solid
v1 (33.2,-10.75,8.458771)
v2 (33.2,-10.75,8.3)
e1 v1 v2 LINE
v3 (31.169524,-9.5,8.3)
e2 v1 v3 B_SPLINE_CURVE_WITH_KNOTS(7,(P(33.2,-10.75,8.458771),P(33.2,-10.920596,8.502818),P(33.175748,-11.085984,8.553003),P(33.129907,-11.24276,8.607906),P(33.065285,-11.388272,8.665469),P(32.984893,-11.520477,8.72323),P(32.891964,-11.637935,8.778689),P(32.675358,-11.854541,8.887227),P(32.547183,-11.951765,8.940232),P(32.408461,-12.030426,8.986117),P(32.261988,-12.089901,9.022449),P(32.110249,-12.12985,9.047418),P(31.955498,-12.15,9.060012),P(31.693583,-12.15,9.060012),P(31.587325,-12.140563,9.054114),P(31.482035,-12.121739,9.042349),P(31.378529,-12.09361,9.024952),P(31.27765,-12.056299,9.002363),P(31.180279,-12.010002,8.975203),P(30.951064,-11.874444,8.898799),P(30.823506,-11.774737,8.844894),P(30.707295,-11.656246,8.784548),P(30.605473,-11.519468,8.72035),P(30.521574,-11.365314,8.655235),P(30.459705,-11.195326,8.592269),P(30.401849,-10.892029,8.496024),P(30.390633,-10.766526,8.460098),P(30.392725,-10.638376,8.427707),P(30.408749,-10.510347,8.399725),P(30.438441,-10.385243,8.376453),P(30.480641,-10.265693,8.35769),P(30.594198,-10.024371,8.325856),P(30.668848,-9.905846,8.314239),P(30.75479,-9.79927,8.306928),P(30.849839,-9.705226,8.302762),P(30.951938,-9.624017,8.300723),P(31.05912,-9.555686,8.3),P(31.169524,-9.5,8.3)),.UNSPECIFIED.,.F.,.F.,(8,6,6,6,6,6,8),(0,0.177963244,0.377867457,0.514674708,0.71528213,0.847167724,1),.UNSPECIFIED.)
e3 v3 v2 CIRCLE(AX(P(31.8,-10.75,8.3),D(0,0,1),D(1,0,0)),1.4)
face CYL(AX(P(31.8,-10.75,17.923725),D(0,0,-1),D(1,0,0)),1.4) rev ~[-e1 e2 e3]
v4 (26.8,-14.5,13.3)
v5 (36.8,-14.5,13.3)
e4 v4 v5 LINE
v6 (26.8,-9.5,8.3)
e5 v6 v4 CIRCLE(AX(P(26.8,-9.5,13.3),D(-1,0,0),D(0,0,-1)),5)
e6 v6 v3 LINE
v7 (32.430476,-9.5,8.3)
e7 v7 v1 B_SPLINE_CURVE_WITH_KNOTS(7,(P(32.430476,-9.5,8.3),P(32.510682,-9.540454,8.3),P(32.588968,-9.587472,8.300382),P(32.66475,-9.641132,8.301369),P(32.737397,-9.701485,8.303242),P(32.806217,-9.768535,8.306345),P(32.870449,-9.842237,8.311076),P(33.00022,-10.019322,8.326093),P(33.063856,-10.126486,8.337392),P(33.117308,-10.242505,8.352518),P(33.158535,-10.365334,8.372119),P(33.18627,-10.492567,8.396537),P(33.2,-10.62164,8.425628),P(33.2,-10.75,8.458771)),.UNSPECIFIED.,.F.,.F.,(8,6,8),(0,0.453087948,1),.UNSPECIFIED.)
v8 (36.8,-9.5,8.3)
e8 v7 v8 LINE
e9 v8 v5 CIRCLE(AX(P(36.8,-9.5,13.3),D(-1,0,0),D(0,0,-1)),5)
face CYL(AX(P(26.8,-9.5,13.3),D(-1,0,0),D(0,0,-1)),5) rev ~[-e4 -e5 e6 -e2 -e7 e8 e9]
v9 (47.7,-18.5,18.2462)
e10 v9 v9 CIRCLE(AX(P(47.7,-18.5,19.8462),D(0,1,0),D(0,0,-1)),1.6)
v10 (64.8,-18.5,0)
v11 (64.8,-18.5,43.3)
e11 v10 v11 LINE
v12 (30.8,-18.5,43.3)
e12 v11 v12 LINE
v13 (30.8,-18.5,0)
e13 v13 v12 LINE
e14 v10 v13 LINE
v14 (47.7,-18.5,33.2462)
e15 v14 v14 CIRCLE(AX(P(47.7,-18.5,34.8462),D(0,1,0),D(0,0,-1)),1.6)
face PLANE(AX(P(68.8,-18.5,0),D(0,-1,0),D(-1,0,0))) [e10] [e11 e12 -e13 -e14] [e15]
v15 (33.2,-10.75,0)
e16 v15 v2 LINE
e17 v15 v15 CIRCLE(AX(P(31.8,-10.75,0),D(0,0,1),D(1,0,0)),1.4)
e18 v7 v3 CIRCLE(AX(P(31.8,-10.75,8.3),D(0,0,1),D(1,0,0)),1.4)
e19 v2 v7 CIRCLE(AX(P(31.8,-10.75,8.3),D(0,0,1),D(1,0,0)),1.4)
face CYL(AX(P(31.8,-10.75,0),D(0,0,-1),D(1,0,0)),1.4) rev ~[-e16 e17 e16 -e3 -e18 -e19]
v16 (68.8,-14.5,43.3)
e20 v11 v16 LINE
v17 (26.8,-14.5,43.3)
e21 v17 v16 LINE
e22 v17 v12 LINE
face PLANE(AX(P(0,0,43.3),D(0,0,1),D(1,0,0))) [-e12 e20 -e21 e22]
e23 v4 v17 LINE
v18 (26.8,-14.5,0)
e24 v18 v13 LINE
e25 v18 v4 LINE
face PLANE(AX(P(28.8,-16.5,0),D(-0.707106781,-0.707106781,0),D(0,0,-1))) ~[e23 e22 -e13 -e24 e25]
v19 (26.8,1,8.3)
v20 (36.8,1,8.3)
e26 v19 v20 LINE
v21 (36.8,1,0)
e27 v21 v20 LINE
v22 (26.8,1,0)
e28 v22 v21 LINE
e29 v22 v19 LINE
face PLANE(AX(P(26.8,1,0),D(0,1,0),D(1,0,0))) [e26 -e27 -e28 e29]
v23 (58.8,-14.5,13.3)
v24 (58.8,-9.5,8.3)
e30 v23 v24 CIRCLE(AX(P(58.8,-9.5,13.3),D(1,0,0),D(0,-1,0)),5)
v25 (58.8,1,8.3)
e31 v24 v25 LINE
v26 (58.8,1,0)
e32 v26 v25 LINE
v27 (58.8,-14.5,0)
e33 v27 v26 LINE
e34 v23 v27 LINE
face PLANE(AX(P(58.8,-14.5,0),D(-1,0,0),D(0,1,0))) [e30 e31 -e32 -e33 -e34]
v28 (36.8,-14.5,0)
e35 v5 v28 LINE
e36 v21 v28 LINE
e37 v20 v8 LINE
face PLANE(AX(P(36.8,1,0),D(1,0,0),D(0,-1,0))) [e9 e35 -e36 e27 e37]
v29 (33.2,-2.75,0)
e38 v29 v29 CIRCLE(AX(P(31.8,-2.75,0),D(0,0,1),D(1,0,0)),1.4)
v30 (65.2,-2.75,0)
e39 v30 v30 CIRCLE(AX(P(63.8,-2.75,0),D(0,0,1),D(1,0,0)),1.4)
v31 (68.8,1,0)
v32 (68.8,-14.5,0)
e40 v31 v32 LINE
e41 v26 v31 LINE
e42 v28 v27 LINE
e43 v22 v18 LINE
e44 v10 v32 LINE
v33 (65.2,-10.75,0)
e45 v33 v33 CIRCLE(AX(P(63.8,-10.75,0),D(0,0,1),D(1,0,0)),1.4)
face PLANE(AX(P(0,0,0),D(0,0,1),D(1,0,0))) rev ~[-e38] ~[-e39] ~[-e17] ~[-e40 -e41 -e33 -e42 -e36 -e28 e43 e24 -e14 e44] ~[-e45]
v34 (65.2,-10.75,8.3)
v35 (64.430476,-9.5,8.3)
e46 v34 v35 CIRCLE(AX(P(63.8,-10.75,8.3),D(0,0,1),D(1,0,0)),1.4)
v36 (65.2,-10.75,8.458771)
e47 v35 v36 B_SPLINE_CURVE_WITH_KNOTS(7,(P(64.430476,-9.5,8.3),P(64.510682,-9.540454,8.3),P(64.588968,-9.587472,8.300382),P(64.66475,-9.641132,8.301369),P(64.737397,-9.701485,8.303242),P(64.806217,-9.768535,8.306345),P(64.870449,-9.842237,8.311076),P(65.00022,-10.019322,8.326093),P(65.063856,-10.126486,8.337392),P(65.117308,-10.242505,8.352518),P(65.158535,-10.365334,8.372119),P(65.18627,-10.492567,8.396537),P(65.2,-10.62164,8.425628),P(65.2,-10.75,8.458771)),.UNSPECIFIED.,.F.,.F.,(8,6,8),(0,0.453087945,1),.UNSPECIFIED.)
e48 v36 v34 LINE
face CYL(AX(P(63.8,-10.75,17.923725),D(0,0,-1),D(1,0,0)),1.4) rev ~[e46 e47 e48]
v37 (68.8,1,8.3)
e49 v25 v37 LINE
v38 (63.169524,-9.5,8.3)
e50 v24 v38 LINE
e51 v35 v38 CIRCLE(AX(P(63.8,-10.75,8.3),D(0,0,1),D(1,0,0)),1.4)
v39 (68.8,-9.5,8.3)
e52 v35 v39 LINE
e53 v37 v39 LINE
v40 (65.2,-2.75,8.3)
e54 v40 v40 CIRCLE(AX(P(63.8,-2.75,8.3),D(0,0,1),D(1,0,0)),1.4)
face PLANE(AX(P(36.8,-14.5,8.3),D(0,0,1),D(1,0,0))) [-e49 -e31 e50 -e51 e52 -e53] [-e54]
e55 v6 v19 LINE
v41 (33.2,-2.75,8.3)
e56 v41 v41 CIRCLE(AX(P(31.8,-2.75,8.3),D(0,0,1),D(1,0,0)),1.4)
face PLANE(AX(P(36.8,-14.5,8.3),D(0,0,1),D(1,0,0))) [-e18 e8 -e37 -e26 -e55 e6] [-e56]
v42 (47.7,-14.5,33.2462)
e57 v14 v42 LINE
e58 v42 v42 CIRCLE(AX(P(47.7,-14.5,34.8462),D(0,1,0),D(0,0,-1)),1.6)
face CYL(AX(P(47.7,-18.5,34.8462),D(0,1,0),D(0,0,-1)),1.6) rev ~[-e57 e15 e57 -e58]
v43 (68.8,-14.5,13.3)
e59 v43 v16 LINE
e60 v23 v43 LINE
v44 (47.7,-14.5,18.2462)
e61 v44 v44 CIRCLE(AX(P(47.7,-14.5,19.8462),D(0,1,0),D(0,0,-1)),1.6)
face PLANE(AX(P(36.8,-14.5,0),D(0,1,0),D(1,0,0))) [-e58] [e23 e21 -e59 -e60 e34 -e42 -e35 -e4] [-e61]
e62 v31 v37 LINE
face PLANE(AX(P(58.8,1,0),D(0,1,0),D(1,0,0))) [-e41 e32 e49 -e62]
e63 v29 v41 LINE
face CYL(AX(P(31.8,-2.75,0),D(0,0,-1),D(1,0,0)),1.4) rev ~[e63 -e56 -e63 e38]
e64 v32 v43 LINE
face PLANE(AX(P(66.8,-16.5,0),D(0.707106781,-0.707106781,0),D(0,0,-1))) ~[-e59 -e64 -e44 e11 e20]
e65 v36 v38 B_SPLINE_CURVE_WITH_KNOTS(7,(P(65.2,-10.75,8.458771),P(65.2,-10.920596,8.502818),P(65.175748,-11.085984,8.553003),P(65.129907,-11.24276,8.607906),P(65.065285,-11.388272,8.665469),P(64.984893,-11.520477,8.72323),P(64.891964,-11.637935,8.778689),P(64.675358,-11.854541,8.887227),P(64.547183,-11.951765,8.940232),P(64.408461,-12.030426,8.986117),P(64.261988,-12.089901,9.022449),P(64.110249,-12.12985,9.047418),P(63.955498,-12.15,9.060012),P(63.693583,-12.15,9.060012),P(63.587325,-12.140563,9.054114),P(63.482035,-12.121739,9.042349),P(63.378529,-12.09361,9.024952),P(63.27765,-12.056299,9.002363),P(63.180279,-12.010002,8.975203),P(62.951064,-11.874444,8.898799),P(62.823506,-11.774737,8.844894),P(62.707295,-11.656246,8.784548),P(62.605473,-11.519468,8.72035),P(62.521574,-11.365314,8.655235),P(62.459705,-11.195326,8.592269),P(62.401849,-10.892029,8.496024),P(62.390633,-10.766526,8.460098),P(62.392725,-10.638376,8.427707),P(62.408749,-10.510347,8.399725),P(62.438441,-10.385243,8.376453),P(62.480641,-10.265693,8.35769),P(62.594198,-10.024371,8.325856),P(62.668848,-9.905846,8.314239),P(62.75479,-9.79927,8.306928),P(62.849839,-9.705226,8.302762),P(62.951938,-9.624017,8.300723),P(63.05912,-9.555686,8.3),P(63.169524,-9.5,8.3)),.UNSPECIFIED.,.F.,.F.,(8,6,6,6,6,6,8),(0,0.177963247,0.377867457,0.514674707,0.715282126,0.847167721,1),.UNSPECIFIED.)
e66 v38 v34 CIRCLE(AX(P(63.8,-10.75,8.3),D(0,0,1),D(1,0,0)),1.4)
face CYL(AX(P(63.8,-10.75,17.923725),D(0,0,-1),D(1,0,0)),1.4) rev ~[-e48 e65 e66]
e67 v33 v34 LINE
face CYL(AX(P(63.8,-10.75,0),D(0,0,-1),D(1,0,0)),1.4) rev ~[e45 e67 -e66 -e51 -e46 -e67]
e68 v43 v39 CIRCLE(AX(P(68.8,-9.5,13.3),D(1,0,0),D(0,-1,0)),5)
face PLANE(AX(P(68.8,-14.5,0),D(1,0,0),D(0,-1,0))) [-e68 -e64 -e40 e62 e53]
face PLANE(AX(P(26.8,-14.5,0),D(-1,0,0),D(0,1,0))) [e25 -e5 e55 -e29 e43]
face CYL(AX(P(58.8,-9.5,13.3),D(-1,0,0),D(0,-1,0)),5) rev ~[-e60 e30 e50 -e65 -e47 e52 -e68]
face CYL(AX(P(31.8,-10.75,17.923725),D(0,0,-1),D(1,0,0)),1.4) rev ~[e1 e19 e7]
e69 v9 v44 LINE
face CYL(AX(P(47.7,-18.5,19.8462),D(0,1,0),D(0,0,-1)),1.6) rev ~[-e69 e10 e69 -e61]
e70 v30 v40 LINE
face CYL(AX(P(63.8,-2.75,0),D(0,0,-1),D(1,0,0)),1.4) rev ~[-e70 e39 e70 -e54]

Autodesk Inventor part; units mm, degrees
ref_plane "YZ Plane" through (0, 0, 0) normal (1, 0, 0) x (0, 1, 0)
ref_plane "XZ Plane" through (0, 0, 0) normal (0, 1, 0) x (-1, 0, 0)
ref_plane "Work Plane1" through (0, 0, 0) normal (0, 0, 1) x (1, 0, 0)
ref_plane "Work Plane2" through (40.2, -14.35, 43.3) normal (0, 0, 1) x (1, 0, 0)
sketch "Sketch1" plane through (0, 0, 0) normal (0, 0, 1) x (1, 0, 0)
  circle A0 centre (31.8, -10.75) radius 1.4 projected
  circle A1 centre (63.8, -10.75) radius 1.4 projected
  circle A2 centre (63.8, -2.75) radius 1.4 projected
  circle A3 centre (31.8, -2.75) radius 1.4 projected
  circle A4 centre (47.8, -6.75) radius 3.0846 projected
  line L0 (21, -14.5) -> (21, 1) projected
  line L1 (21, -14.5) -> (74.6, -14.5) projected
  line L2 (74.6, 1) -> (74.6, -14.5) projected
  line L3 (21, 1) -> (74.6, 1) projected
  circle A5 centre (47.8, -6.75) radius 2.196 construction
  line L4 (55.4, 0.85) -> (40.2, 0.85) construction
  line L5 (40.2, 0.85) -> (40.2, -14.35) construction
  line L6 (40.2, -14.35) -> (55.4, -14.35) construction
  line L7 (55.4, -14.35) -> (55.4, 0.85) construction
  line L8 (68.8, -14.5) -> (58.8, -14.5)
  line L9 (58.8, -14.5) -> (58.8, 1)
  line L10 (58.8, 1) -> (68.8, 1)
  line L11 (68.8, 1) -> (68.8, -14.5)
  line L12 (68.8, -14.5) -> (58.8, 1) construction
  line L13 (58.8, -14.5) -> (68.8, 1) construction
  line L14 (36.8, -14.5) -> (26.8, -14.5)
  line L15 (26.8, -14.5) -> (26.8, 1)
  line L16 (26.8, 1) -> (36.8, 1)
  line L17 (36.8, 1) -> (36.8, -14.5)
  line L18 (36.8, -14.5) -> (26.8, 1) construction
  line L19 (26.8, -14.5) -> (36.8, 1) construction
  line L20 (26.8, -14.5) -> (68.8, -14.5)
  line L21 (68.8, -14.5) -> (68.8, -18.5)
  line L22 (68.8, -18.5) -> (26.8, -18.5)
  line L23 (26.8, -18.5) -> (26.8, -14.5)
  point P0 (0, 0)
  point P1 (63.8, -6.75)
  point P2 (31.8, -6.75)
  dimension "d0" = 10
  dimension "d1" = 15.5
  dimension "d2" = 0
  dimension "d3" = 10
  dimension "d4" = 15.5
  dimension "d7" = 4
extrude "Extrusion1" add sketch "Sketch1" along normal up to surface (43.3 mm away) contours L15 L3 L17 L1 | L1 L21 L22 L23 | L9 L3 L11 L1
sketch "Sketch2" plane through (26.8, -18.5, 0) normal (0, -1, 0) x (1, 0, 0)
  circle A0 centre (20.9, 34.8462) radius 1 projected
  circle A1 centre (20.9, 19.8462) radius 1 projected
  line L0 (13.4, 13) -> (28.6, 13) projected
  line L1 (28.6, 13) -> (28.6, 43.3) projected
  line L2 (13.4, 43.3) -> (28.6, 43.3) projected
  line L3 (13.4, 13) -> (13.4, 43.3) projected
  point P0 (-26.8, 0)
hole "Hole1" at (47.7, -18.5, 19.8462) at (47.7, -18.5, 34.8462) direction (0, 1, 0) diameter 3.2 end through all
chamfer "Chamfer1" distance 4 angle 45 2 edges at (26.8, -18.5, 21.65) (68.8, -18.5, 21.65)
sketch "Sketch3" plane through (36.8, -14.5, 43.3) normal (0, 0, 1) x (1, 0, 0)
  line L0 (32, 0) -> (28, -4) projected
  line L1 (32, 15.5) -> (32, 0) projected
  line L2 (22, 15.5) -> (32, 15.5) projected
  line L3 (22, 0) -> (22, 15.5) projected
  line L4 (0, 0) -> (22, 0) projected
  line L5 (0, 15.5) -> (0, 0) projected
  line L6 (-10, 15.5) -> (0, 15.5) projected
  line L7 (-10, 0) -> (-10, 15.5) projected
  line L8 (-6, -4) -> (-10, 0) projected
  line L9 (28, -4) -> (-6, -4) projected
  circle A0 centre (27, 3.75) radius 1.4 projected
  circle A1 centre (27, 11.75) radius 1.4 projected
  circle A2 centre (-5, 3.75) radius 1.4 projected
  circle A3 centre (-5, 11.75) radius 1.4 projected
  line L10 (-10, 0) -> (32, 0)
  point P0 (-36.8, 14.5)
extrude "Extrusion2" cut sketch "Sketch3" against normal blind 35 contours L10 L3 L2 L1 | L10 L7 L6 L5
fillet "Fillet1" radius 5 2 edges at (63.8, -14.5, 8.3) (31.8, -14.5, 8.3)
properties part number "31_MTP_wellplate_Solenoid_adapter"
